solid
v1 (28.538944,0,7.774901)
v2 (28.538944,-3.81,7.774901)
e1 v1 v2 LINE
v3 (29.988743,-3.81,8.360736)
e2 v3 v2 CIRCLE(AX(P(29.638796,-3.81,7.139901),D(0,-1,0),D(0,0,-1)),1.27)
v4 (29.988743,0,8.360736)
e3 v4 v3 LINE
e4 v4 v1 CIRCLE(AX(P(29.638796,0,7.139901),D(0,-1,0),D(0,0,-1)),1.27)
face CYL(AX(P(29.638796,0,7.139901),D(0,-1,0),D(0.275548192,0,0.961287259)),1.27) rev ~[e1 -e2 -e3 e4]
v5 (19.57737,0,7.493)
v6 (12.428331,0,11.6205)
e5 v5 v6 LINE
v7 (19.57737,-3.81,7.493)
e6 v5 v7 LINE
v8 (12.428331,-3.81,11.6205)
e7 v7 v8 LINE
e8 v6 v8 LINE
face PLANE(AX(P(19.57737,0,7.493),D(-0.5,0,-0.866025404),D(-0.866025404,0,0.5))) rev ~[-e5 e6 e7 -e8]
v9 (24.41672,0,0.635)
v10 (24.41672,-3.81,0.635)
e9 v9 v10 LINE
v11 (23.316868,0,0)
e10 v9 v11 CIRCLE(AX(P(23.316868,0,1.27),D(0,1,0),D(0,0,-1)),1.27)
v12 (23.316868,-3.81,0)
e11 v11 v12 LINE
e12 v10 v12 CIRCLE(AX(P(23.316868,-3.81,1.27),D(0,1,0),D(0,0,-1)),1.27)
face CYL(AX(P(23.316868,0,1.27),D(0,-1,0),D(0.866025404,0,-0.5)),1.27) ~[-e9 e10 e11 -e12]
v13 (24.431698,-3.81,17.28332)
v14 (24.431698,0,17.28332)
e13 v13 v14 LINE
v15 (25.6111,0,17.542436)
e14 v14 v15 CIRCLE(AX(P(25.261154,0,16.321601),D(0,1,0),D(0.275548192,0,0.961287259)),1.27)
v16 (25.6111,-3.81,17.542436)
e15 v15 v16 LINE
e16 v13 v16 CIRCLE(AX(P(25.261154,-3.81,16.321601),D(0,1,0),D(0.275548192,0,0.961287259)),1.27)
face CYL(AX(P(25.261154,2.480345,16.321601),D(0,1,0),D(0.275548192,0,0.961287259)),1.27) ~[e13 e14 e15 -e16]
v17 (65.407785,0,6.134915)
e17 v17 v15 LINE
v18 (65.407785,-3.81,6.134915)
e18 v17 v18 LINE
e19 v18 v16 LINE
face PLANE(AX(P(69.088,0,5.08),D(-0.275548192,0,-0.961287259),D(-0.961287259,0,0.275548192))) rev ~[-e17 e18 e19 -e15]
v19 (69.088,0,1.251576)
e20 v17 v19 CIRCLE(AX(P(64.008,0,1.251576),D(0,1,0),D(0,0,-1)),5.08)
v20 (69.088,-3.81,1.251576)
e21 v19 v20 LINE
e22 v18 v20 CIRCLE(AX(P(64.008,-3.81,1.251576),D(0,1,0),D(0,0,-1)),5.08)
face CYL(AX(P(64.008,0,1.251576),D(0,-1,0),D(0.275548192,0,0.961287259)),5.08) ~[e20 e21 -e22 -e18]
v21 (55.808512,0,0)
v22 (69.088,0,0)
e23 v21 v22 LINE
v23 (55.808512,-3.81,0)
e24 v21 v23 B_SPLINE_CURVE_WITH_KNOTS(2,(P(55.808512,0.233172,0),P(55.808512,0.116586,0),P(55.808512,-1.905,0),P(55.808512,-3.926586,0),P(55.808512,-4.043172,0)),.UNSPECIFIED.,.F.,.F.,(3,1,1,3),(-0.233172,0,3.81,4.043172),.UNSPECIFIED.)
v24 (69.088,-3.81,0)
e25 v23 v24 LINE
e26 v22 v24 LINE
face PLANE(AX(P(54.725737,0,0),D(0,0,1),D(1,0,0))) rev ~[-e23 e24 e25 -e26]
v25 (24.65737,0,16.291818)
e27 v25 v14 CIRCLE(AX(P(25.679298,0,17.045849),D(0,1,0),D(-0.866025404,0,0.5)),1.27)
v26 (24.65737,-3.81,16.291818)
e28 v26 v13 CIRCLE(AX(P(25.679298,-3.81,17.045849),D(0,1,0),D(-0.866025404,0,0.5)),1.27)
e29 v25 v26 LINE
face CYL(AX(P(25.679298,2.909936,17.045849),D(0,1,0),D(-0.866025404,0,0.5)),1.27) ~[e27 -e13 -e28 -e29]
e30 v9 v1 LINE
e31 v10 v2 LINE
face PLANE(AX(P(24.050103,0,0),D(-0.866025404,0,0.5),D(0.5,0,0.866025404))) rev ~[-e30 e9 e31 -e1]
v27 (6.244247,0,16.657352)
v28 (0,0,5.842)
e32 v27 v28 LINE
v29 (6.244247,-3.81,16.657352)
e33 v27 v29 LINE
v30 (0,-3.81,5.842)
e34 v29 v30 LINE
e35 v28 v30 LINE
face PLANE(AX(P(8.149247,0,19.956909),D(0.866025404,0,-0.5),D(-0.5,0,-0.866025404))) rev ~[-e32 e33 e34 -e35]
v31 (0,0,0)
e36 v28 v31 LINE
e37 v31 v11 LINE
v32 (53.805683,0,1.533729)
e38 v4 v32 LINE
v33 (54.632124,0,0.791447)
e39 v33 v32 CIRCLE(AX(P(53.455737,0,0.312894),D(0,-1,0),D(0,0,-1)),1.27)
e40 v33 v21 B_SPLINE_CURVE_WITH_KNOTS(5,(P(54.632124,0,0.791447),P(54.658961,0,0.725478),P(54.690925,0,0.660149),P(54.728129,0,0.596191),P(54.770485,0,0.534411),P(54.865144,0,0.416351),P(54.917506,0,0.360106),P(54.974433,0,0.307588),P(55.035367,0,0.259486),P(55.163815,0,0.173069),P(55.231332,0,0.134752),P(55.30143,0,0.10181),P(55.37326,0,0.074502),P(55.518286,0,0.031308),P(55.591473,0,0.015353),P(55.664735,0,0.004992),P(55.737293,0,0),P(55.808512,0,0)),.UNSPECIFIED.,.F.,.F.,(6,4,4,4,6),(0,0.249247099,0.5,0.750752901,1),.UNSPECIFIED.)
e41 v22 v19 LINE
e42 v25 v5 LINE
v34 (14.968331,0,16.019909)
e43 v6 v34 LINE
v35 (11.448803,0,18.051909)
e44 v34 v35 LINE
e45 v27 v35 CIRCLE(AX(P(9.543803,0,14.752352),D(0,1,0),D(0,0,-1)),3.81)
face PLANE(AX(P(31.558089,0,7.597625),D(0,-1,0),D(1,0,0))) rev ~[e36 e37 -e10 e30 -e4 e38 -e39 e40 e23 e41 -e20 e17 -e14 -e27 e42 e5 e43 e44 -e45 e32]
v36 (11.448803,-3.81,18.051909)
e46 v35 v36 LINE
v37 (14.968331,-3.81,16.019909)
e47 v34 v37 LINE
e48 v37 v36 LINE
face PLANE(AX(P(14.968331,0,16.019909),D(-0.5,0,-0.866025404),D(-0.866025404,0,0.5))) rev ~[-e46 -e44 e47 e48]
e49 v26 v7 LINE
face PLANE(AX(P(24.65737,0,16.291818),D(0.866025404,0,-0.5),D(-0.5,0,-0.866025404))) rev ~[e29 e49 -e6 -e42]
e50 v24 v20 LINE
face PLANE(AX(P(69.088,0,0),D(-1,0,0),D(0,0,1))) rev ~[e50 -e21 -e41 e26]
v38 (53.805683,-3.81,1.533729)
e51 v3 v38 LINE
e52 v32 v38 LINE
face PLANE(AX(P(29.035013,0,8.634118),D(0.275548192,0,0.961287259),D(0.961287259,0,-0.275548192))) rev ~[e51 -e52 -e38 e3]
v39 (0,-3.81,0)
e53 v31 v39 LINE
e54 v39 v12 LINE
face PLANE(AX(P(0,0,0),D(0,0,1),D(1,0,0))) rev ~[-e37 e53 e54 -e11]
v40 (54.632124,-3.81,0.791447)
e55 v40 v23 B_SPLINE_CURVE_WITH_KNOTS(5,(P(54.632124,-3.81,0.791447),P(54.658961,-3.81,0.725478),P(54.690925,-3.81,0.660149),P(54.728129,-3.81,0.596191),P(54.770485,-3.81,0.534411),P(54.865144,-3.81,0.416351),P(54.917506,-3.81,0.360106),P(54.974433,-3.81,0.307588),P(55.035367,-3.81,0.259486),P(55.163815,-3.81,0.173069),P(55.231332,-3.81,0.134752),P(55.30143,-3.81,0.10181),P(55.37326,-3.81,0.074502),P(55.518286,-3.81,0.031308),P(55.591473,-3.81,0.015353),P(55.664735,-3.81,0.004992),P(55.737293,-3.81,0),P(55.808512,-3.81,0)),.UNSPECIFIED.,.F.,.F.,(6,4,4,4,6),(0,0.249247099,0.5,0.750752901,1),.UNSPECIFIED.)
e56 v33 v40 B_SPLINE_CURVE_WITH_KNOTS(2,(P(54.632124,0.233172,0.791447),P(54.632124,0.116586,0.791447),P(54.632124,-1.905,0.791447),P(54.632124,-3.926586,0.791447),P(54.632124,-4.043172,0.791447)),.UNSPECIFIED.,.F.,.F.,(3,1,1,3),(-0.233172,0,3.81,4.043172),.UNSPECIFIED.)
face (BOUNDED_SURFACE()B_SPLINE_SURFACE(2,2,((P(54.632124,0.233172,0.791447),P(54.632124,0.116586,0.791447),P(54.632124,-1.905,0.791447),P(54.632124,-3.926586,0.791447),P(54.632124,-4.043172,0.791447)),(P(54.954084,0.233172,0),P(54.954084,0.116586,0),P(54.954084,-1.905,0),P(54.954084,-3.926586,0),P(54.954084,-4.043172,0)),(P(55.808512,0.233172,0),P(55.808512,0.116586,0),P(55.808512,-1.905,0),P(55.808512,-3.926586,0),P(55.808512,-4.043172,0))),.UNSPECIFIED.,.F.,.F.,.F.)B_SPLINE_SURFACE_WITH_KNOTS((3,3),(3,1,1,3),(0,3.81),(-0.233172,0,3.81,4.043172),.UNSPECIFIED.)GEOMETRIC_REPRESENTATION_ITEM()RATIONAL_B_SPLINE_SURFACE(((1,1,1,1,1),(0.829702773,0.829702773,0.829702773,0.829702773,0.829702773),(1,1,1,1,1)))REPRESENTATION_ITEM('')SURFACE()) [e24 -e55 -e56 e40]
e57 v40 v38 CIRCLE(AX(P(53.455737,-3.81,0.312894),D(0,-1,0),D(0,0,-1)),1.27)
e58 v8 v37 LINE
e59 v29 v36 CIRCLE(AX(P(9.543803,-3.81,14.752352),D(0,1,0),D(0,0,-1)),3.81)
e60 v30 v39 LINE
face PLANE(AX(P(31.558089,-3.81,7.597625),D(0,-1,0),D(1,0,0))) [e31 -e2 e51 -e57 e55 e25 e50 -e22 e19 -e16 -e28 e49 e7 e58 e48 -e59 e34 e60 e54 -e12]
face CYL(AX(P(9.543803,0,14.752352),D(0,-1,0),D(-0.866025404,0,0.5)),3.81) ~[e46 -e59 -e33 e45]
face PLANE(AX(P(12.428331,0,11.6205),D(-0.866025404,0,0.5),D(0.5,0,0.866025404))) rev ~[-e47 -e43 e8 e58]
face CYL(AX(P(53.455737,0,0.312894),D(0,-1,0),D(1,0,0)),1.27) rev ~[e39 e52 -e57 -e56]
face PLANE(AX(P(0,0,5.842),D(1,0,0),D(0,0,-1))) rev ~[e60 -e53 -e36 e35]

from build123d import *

# Parameters (mm, degrees)
F1_DEPTH    = 3.81
F2_T1_DEPTH = 8.770689479
F2_T3_DEPTH = 9.6298711326
F3_R        = 3.81
F4_R        = 5.08
F5_R        = 1.27
F6_R        = 1.27


# Not quite as in the source:
# - a fillet or chamfer that OpenCascade refuses, or shapes differently, is made with other operations: its cross-section is extruded or revolved along the edge and cut away or added


with BuildPart() as f1:
    # F0 (on Front) → F1 (new body)
    with BuildSketch(Plane.XZ):
        Polygon((0, 5.842), (0, 0), (24.0501028134, 0), (29.035013032, 8.6341177699), (54.7257371953, 1.27), (54.7257371953, 0), (69.088, 0), (69.088, 5.08), (24.657370278, 17.8158181024), (23.9974589203, 16.6728181024), (24.657370278, 16.2918181024), (19.577370278, 7.493), (12.4283305697, 11.6205), (14.9683305697, 16.0199090512), (8.1492465403, 19.9569090512), align=None)
    extrude(amount=F1_DEPTH)

    # F2: fillet of radius 1.27 on 2 edges, made by hand

    # F2_s2 → F2_t1 (cut)
    with BuildSketch(Plane.XZ.offset(-2.4803447395)):
        with BuildLine():
            ThreePointArc((25.6110997962, 17.5424362994), (24.7853486084, 17.4991029103), (24.16130133, 16.9566014806))
            Line((24.16130133, 16.9566014806), (24.657370278, 17.8158181024))
            Line((24.657370278, 17.8158181024), (25.6110997962, 17.5424362994))
        make_face()
    extrude(amount=F2_T1_DEPTH, mode=Mode.SUBTRACT)

    # F2_s4 → F2_t3 (cut)
    with BuildSketch(Plane.XZ.offset(-2.9099355663)):
        with BuildLine():
            ThreePointArc((24.5794460335, 17.680849352), (24.4112920489, 16.9747145746), (24.657370278, 16.2918181024))
            Line((24.657370278, 16.2918181024), (23.9974589203, 16.6728181024))
            Line((23.9974589203, 16.6728181024), (24.5794460335, 17.680849352))
        make_face()
    extrude(amount=F2_T3_DEPTH, mode=Mode.SUBTRACT)

    # F3
    f3_edges = [f1.edges().sort_by_distance(p)[0] for p in [
        (8.149247, -1.905, 19.956909),
    ]]
    fillet(f3_edges, radius=F3_R)

    # F4
    f4_edges = [f1.edges().sort_by_distance(p)[0] for p in [
        (69.088, -1.905, 5.08),
    ]]
    fillet(f4_edges, radius=F4_R)

    # F5
    f5_edges = [f1.edges().sort_by_distance(p)[0] for p in [
        (29.035013, -1.905, 8.634118),
        (24.050103, -1.905, 0),
        (54.725737, -1.905, 1.27),
    ]]
    fillet(f5_edges, radius=F5_R)

    # F6
    f6_edges = [f1.edges().sort_by_distance(p)[0] for p in [
        (54.725737, -1.905, 0),
    ]]
    fillet(f6_edges, radius=F6_R)


solid = f1.part
